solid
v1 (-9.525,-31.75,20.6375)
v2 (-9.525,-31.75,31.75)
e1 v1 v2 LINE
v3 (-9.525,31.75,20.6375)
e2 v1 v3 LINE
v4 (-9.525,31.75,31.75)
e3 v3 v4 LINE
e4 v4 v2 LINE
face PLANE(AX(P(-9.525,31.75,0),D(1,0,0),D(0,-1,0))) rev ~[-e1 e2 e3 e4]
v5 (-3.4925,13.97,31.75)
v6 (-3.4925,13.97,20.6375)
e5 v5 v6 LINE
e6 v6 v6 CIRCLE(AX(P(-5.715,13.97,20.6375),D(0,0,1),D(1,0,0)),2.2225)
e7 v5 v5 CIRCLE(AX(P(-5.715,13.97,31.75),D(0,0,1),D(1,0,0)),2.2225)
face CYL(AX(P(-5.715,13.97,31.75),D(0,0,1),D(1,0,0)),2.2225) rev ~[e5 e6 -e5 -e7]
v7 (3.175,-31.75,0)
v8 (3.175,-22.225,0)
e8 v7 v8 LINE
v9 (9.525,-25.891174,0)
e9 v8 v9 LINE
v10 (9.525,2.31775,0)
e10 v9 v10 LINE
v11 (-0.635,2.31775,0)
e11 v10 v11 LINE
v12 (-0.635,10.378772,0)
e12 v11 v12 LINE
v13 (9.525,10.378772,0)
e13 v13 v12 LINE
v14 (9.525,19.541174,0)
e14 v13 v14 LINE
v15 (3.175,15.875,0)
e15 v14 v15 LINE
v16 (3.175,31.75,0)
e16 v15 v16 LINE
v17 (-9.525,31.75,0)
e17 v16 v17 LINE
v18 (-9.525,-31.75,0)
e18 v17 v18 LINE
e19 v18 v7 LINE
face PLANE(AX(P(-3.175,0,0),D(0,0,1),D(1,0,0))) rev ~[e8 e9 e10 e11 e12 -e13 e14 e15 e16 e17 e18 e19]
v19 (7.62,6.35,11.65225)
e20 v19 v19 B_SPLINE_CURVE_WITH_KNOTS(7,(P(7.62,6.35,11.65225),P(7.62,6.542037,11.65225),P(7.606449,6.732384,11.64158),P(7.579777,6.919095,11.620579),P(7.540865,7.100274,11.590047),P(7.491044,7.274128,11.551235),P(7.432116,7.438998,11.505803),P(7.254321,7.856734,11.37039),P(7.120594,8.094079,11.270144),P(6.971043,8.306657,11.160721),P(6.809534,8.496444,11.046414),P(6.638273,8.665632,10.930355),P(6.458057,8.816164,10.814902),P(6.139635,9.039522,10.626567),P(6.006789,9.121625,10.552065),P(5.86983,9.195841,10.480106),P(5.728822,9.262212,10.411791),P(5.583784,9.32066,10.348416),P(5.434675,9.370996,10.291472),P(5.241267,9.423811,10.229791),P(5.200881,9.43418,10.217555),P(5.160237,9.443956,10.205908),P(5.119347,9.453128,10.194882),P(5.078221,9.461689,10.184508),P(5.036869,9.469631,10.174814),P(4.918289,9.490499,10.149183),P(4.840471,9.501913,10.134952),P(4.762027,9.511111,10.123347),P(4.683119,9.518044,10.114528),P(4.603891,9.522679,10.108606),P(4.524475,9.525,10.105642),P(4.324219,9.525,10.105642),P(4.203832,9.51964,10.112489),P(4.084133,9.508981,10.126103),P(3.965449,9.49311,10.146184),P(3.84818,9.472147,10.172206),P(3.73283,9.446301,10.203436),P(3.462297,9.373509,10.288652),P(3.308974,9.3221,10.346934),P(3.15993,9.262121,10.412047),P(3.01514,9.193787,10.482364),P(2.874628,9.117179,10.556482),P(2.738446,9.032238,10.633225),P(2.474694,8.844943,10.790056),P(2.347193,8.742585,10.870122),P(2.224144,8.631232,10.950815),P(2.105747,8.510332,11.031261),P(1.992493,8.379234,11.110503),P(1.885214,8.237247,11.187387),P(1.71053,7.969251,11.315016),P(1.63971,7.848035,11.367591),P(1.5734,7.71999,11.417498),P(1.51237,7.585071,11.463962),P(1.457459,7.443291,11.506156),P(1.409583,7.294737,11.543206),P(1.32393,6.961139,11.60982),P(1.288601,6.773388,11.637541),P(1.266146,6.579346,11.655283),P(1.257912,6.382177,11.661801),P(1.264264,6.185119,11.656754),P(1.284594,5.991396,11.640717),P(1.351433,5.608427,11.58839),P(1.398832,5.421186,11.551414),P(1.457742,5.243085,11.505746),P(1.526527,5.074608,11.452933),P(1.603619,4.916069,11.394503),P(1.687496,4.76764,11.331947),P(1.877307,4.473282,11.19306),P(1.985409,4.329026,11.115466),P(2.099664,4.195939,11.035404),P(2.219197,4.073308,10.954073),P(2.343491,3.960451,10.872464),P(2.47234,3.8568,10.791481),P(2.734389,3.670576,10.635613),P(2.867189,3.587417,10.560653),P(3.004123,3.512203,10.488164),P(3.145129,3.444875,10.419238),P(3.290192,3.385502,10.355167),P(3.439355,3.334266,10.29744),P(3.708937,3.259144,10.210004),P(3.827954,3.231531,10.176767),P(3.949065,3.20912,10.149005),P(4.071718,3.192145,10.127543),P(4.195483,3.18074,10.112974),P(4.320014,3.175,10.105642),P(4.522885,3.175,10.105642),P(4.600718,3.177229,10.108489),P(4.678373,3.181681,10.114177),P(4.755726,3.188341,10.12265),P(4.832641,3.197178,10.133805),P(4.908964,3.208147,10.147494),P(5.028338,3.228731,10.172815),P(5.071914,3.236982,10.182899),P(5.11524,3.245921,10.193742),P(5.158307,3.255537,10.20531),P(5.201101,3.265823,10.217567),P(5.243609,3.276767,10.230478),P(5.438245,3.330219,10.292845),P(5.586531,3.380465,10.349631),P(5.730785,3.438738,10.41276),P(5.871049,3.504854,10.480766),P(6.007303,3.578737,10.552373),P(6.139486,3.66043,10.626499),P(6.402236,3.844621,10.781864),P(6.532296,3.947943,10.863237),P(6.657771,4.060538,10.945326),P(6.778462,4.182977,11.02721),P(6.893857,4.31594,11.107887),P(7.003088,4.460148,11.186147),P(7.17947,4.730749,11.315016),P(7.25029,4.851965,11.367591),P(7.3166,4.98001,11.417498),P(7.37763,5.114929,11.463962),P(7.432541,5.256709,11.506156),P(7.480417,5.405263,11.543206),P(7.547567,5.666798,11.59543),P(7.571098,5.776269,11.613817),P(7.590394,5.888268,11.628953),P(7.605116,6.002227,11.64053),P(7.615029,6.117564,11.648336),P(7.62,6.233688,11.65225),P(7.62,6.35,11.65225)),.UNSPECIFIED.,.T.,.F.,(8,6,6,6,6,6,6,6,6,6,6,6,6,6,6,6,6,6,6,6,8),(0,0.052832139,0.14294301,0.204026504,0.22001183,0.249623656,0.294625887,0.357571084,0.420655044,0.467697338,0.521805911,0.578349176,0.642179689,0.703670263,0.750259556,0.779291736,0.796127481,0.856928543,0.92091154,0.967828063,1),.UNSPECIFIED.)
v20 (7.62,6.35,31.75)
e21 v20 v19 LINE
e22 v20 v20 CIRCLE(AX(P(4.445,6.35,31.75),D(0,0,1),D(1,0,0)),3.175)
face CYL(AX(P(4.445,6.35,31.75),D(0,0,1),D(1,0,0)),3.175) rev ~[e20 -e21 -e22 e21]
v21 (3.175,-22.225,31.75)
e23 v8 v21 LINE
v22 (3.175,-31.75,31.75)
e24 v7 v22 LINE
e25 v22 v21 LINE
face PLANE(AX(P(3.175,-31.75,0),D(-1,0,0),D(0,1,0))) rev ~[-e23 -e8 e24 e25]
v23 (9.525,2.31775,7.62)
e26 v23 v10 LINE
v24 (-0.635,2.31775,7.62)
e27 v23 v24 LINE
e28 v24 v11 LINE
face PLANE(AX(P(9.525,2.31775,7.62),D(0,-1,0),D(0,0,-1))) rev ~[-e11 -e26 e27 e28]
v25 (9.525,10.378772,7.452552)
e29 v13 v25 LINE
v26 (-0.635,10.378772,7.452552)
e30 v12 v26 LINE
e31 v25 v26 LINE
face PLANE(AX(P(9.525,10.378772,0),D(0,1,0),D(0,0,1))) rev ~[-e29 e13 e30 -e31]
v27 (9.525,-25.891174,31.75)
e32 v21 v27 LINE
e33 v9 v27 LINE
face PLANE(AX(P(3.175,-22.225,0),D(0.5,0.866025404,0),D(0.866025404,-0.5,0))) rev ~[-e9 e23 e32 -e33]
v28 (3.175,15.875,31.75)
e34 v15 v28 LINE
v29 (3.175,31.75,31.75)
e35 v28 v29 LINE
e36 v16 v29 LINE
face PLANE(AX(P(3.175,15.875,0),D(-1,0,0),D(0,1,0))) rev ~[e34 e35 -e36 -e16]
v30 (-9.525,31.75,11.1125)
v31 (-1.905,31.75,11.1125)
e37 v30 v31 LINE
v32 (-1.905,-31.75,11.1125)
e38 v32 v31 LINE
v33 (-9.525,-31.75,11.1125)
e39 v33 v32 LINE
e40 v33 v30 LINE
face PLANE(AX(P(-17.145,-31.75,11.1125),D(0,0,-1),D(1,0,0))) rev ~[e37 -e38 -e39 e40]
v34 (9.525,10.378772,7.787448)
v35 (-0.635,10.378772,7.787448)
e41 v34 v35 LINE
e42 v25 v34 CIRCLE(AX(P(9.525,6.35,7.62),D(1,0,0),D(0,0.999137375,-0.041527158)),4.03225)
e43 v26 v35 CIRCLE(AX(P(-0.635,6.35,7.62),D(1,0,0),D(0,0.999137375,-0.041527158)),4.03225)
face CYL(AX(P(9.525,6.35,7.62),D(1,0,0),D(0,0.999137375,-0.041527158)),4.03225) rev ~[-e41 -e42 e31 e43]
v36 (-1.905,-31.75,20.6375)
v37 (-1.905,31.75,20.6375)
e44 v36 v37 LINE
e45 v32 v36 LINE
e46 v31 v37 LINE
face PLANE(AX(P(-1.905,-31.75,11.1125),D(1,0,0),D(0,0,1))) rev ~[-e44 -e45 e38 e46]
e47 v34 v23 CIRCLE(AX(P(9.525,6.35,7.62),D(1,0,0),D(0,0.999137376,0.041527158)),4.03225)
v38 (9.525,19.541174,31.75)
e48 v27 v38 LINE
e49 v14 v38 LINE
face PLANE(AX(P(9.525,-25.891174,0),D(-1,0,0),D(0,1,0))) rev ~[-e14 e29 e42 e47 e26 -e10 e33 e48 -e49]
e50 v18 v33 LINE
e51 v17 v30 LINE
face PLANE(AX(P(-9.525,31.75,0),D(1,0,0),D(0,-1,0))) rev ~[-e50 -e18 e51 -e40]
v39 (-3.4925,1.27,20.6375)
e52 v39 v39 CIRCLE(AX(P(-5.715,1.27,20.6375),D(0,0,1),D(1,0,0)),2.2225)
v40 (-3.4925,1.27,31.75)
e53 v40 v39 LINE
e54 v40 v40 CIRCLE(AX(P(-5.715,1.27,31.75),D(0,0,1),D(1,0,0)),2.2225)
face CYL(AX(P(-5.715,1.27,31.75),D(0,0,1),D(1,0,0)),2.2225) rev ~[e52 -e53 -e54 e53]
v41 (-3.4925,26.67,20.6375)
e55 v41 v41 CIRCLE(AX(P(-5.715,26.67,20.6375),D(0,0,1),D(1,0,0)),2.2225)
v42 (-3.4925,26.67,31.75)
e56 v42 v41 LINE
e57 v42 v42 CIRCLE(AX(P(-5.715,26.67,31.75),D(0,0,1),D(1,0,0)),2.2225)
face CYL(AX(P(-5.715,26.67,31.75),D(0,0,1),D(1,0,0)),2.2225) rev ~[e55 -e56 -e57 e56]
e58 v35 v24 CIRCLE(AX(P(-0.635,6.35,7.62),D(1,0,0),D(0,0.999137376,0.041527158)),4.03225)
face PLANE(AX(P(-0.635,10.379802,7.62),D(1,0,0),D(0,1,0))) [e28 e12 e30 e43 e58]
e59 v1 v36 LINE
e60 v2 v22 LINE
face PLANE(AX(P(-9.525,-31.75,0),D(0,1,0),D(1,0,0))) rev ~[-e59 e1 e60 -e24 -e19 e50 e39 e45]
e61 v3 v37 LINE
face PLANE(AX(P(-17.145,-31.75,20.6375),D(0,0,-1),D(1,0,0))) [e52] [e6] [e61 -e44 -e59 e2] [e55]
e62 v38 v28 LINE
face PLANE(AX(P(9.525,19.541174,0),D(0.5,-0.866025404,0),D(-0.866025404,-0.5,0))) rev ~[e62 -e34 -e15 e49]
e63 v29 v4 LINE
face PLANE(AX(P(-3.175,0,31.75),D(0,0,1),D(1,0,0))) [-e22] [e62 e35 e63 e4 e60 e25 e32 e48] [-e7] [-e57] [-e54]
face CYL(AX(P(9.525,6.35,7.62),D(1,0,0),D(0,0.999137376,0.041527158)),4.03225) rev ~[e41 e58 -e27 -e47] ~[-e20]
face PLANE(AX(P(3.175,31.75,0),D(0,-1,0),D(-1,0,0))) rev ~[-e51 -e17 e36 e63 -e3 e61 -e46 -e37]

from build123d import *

# Parameters (mm, degrees)
F1_DEPTH = 31.75
F2_W     = 15.24
F2_H     = 9.525
F3_DEPTH = 63.501
F4_R     = 2.2225
F5_DEPTH = 11.1125
F6_R     = 3.175
F7_DEPTH = 25.4
F9_DEPTH = 10.16


# Not quite as in the source:
# - a feature names something its author has since deleted; it is built from what else it names


with BuildPart() as f1:
    # F0 (on Top) → F1 (new body)
    with BuildSketch(Plane.XY):
        Polygon((3.175, 31.75), (-9.525, 31.75), (-9.525, -31.75), (3.175, -31.75), (3.175, -22.225), (3.175, 15.875), align=None)
        Polygon((9.525, 19.5411742094), (3.175, 15.875), (3.175, -22.225), (9.525, -25.8911742094), align=None)
    extrude(amount=F1_DEPTH)

    # F2 (on face) → F3 (cut, through all)
    with BuildSketch(Plane.XZ.offset(31.75)):
        with Locations((-9.525, 15.875)):
            Rectangle(F2_W, F2_H)
    extrude(amount=-F3_DEPTH, mode=Mode.SUBTRACT)

    # F4 (on face) → F5 (cut, through all)
    with BuildSketch(Plane.XY.offset(31.75)):
        with Locations((-5.715, 1.27)):
            Circle(F4_R)
        with Locations((-5.715, 13.97)):
            Circle(F4_R)
        with Locations((-5.715, 26.67)):
            Circle(F4_R)
    extrude(amount=-F5_DEPTH, mode=Mode.SUBTRACT)

    # F6 (on face) → F7 (cut)
    with BuildSketch(Plane.XY.offset(31.75)):
        with Locations((4.445, 6.35)):
            Circle(F6_R)
    extrude(amount=-F7_DEPTH, mode=Mode.SUBTRACT)

    # F8 (on face) → F9 (cut)
    with BuildSketch(Plane.YZ.offset(9.525)):
        with BuildLine():
            Line((10.3787716824, 7.7874478821), (10.3787716824, 7.4525521179))
            ThreePointArc((10.3787716824, 7.4525521179), (10.38225, 7.62), (10.3787716824, 7.7874478821))
        make_face()
        with BuildLine():
            Line((10.3787716824, 0), (10.3787716824, 7.4525521179))
            Line((10.3787716824, 7.4525521179), (10.3787716824, 7.7874478821))
            ThreePointArc((10.3787716824, 7.7874478821), (6.2662579975, 11.6513803268), (2.31775, 7.62))
            Line((2.31775, 7.62), (2.31775, 0))
            Line((2.31775, 0), (10.3787716824, 0))
        make_face()
    extrude(amount=-F9_DEPTH, mode=Mode.SUBTRACT)


solid = f1.part
